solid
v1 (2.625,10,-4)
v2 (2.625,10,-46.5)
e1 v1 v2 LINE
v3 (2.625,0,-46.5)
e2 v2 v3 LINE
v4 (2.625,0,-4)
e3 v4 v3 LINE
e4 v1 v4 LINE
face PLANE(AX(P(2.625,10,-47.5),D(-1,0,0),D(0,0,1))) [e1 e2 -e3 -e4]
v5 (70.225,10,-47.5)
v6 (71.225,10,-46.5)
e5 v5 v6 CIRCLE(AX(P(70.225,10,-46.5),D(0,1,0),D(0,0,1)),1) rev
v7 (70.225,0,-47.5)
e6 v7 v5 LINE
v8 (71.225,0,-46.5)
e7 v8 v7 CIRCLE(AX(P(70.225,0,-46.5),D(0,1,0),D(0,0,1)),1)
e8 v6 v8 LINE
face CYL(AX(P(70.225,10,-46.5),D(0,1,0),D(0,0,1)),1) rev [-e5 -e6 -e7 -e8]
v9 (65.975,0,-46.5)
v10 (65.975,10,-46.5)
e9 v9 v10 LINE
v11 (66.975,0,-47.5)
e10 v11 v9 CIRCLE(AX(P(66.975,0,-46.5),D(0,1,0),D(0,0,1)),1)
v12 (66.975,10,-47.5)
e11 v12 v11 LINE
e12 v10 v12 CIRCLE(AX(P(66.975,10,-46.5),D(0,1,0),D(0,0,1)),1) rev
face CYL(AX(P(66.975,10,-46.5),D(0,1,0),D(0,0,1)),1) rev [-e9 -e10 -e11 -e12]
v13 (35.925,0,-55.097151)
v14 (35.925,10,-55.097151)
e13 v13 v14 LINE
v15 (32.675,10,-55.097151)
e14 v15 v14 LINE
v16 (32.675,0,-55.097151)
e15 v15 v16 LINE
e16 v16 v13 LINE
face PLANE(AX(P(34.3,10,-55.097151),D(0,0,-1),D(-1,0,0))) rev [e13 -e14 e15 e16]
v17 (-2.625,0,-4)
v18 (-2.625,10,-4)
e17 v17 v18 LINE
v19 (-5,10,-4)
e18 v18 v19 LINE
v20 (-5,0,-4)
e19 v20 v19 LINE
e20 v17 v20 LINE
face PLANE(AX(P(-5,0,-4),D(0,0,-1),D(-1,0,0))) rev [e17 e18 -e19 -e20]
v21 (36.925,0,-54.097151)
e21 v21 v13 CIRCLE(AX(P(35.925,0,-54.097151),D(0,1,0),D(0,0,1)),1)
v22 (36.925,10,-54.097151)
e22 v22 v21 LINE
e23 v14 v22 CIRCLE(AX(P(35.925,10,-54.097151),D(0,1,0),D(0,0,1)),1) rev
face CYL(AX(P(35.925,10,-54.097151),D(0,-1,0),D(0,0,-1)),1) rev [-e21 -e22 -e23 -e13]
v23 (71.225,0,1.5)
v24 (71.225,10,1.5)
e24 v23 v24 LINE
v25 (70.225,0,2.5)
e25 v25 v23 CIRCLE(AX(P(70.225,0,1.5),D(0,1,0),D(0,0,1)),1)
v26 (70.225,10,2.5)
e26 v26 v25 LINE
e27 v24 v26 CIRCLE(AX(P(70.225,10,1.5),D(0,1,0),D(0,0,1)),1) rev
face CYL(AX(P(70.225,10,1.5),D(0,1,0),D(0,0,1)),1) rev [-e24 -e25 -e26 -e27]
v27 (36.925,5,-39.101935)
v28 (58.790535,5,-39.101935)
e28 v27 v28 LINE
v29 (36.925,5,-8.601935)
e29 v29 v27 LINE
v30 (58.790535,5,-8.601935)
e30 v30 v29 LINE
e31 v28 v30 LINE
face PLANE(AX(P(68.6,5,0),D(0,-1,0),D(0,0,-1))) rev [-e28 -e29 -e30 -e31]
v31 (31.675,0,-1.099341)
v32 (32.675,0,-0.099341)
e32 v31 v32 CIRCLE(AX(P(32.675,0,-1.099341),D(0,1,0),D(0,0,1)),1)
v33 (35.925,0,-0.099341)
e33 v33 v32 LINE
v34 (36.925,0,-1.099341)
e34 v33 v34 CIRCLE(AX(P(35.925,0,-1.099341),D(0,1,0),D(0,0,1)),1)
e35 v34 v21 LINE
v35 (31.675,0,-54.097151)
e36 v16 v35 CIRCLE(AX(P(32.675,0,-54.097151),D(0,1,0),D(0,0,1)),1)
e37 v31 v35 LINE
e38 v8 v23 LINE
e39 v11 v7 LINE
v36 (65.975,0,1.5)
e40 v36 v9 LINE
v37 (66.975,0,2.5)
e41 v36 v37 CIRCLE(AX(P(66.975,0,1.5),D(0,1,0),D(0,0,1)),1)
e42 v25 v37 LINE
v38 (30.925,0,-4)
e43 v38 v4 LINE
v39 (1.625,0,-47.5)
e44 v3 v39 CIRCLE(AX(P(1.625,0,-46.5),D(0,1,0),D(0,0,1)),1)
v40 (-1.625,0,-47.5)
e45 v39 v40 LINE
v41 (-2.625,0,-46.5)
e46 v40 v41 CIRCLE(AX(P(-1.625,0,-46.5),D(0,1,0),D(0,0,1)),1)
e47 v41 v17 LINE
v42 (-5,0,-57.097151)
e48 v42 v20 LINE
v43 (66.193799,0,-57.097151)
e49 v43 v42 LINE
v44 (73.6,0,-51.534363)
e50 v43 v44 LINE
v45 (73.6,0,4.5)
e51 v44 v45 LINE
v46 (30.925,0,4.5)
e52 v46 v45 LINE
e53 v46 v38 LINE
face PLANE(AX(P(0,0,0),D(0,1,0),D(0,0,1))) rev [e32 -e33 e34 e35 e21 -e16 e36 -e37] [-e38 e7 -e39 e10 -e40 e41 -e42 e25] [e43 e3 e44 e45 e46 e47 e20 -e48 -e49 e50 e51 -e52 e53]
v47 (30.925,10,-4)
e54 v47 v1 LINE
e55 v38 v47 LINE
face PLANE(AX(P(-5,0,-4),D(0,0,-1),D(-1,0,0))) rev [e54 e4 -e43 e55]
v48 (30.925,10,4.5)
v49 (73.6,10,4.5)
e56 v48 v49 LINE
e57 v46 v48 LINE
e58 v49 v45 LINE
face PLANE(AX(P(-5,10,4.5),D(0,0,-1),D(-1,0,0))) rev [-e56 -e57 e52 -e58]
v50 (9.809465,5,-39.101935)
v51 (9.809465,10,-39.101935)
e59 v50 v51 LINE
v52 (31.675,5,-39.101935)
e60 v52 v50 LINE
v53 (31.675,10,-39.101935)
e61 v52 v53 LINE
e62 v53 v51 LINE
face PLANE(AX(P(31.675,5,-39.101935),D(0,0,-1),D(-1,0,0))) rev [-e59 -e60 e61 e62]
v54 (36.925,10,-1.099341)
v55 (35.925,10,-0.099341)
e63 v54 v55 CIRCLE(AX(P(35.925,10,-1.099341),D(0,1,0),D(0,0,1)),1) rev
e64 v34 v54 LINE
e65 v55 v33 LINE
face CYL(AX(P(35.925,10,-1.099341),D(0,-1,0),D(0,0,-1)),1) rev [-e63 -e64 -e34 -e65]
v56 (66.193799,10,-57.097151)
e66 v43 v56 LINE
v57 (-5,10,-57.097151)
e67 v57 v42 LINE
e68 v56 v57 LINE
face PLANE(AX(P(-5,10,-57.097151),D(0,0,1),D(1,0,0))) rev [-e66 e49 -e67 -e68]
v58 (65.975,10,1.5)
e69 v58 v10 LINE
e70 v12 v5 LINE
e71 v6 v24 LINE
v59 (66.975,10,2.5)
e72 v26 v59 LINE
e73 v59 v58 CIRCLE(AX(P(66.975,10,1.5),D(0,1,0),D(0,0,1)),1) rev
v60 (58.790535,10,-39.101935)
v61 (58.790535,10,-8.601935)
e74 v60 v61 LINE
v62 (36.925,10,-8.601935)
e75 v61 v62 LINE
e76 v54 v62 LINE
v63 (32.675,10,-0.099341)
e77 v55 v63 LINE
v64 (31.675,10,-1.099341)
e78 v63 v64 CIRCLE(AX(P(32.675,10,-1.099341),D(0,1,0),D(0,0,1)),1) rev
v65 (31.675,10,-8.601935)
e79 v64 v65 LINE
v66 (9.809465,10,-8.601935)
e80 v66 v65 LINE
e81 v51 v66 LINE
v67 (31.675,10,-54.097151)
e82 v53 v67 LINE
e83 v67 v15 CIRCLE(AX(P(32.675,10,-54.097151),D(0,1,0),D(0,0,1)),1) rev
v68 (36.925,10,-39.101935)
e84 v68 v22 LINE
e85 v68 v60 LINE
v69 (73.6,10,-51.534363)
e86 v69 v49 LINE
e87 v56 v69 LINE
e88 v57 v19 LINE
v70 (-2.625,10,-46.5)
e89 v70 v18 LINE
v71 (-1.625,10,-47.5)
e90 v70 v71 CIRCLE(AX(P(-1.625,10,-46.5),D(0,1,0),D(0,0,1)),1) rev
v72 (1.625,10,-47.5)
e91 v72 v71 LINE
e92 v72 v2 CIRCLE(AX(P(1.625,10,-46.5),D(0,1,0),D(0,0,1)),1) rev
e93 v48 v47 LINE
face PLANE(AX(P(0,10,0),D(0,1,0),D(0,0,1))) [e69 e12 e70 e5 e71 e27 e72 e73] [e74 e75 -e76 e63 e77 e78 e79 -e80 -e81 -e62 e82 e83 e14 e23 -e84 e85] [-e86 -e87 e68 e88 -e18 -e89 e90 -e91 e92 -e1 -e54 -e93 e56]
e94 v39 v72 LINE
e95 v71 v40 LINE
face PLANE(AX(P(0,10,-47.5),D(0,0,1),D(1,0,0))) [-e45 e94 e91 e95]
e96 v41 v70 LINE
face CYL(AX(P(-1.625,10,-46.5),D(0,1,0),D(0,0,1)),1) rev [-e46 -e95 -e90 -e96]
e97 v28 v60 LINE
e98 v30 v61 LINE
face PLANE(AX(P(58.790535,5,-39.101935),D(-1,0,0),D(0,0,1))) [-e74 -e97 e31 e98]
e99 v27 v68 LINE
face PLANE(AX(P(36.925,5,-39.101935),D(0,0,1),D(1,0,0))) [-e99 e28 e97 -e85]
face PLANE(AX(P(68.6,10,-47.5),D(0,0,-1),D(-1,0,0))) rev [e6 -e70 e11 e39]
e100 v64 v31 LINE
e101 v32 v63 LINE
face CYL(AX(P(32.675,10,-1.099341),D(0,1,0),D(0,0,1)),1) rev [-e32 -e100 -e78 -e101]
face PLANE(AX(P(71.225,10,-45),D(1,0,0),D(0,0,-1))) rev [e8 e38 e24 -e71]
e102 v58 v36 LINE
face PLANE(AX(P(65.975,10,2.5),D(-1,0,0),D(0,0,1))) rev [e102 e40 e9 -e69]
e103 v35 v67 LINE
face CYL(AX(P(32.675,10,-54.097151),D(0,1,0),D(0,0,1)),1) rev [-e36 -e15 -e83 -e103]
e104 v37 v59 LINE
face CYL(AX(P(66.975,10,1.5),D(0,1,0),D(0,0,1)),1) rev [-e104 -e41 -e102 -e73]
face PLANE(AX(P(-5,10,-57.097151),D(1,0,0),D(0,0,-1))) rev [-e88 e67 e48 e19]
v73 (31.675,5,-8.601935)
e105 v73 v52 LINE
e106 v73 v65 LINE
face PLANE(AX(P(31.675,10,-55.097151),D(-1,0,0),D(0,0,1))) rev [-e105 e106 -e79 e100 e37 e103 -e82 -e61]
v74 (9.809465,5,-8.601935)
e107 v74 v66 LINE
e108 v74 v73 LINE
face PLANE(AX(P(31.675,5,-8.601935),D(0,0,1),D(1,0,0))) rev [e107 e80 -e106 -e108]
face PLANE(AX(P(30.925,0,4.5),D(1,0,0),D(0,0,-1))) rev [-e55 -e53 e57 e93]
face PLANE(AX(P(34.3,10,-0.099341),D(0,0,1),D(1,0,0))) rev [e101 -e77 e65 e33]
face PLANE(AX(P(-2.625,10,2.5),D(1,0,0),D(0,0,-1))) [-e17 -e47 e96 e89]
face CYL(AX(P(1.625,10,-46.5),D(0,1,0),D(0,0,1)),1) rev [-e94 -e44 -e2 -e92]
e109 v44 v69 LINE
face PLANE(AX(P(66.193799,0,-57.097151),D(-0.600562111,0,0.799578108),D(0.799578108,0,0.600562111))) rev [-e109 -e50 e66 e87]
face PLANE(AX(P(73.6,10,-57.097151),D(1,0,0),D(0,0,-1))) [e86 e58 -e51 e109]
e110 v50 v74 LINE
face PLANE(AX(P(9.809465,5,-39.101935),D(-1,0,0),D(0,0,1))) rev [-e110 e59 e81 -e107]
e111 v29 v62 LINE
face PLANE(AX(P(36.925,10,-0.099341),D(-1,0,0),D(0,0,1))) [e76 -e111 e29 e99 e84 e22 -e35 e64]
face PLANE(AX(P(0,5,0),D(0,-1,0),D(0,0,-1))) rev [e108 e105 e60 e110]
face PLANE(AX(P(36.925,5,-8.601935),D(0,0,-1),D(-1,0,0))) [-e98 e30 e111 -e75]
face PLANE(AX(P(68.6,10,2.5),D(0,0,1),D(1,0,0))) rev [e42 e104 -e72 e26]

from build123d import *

# Parameters (mm, degrees)
BOSS_EXTRUDE1_DEPTH = 10
FILLET1_R           = 1
SKETCH2_W           = 21.86553483
SKETCH2_H           = 30.5
CUT_EXTRUDE1_DEPTH  = 5
MIRROR1_DEPTH       = 10
MIRROR1_2_OUTLINE_W = 21.86553483
MIRROR1_2_OUTLINE_H = 30.5
MIRROR1_2_DEPTH     = 5
SKETCH6_W           = 35.925
SKETCH6_H           = 8.5
CUT_EXTRUDE2_DEPTH  = 10


# Read off the part's stored shape, not the designer's step: Mirror1
with BuildPart() as part:
    # Sketch1 → Boss-Extrude1 (new body)
    with BuildSketch(Plane(origin=(0, 0, 0), x_dir=(1, 0, 0), z_dir=(0, 1, 0))):
        Polygon((-5, 57.097150921), (34.3, 57.097150921), (34.3, 55.097150921), (31.675, 55.097150921), (31.675, 52.597150921), (31.675, 2.599340873), (31.675, 0.099340873), (34.3, 0.099340873), (34.3, -4.5), (-5, -4.5), align=None)
        Polygon((-2.625, 45), (-2.625, 0), (-2.625, -2.5), (0, -2.5), (2.625, -2.5), (2.625, 0), (2.625, 45), (2.625, 47.5), (0, 47.5), (-2.625, 47.5), align=None, mode=Mode.SUBTRACT)
    extrude(amount=BOSS_EXTRUDE1_DEPTH)

    # Fillet1
    fillet1_edges = [part.edges().sort_by_distance(p)[0] for p in [
        (31.675, 5, -55.097150921),
        (31.675, 5, -0.099340873),
        (-2.625, 5, -47.5),
        (-2.625, 5, 2.5),
        (2.625, 5, 2.5),
        (2.625, 5, -47.5),
    ]]
    fillet(fillet1_edges, radius=FILLET1_R)

    # Sketch2 → Cut-Extrude1 (cut)
    with BuildSketch(Plane(origin=(0, 10, 0), x_dir=(1, 0, 0), z_dir=(0, 1, 0))):
        with Locations((20.742232585, 23.8519351)):
            Rectangle(SKETCH2_W, SKETCH2_H)
    extrude(amount=-CUT_EXTRUDE1_DEPTH, mode=Mode.SUBTRACT)

    # Mirror1 outline → Mirror1 (add)
    with BuildSketch(Plane(origin=(0, 0, 0), x_dir=(1, 0, 0), z_dir=(0, 1, 0))):
        with BuildLine():
            ThreePointArc((35.925, 55.097150921), (36.632106781, 54.804257702), (36.925, 54.097150921))
            Line((36.925, 54.097150921), (36.925, 39.1019351))
            Line((36.925, 39.1019351), (58.79053483, 39.1019351))
            Line((58.79053483, 39.1019351), (58.79053483, 8.6019351))
            Line((58.79053483, 8.6019351), (36.925, 8.6019351))
            Line((36.925, 8.6019351), (36.925, 1.099340873))
            ThreePointArc((36.925, 1.099340873), (36.632106781, 0.392234092), (35.925, 0.099340873))
            Line((35.925, 0.099340873), (34.3, 0.099340873))
            Line((34.3, 0.099340873), (34.3, -4.5))
            Line((34.3, -4.5), (73.6, -4.5))
            Line((73.6, -4.5), (73.6, 57.097150921))
            Line((73.6, 57.097150921), (34.3, 57.097150921))
            Line((34.3, 57.097150921), (34.3, 55.097150921))
            Line((34.3, 55.097150921), (35.925, 55.097150921))
        make_face()
        with BuildLine():
            Line((70.225, -2.5), (66.975, -2.5))
            ThreePointArc((66.975, -2.5), (66.267893219, -2.207106781), (65.975, -1.5))
            Line((65.975, -1.5), (65.975, 46.5))
            ThreePointArc((65.975, 46.5), (66.267893219, 47.207106781), (66.975, 47.5))
            Line((66.975, 47.5), (70.225, 47.5))
            ThreePointArc((70.225, 47.5), (70.932106781, 47.207106781), (71.225, 46.5))
            Line((71.225, 46.5), (71.225, -1.5))
            ThreePointArc((71.225, -1.5), (70.932106781, -2.207106781), (70.225, -2.5))
        make_face(mode=Mode.SUBTRACT)
    extrude(amount=MIRROR1_DEPTH)

    # Mirror1 2 outline → Mirror1 2 (add)
    with BuildSketch(Plane(origin=(0, 0, 0), x_dir=(1, 0, 0), z_dir=(0, 1, 0))):
        with Locations((47.857767415, 23.8519351)):
            Rectangle(MIRROR1_2_OUTLINE_W, MIRROR1_2_OUTLINE_H)
    extrude(amount=MIRROR1_2_DEPTH)

    # Sketch6 → Cut-Extrude2 (cut)
    with BuildSketch(Plane(origin=(0, 10, 0), x_dir=(1, 0, 0), z_dir=(0, 1, 0))):
        with Locations((12.9625, -0.25)):
            Rectangle(SKETCH6_W, SKETCH6_H)
        Polygon((73.6, 57.097150921), (66.19379908, 57.097150921), (73.6, 51.534362721), align=None)
    extrude(amount=-CUT_EXTRUDE2_DEPTH, mode=Mode.SUBTRACT)


solid = part.part
